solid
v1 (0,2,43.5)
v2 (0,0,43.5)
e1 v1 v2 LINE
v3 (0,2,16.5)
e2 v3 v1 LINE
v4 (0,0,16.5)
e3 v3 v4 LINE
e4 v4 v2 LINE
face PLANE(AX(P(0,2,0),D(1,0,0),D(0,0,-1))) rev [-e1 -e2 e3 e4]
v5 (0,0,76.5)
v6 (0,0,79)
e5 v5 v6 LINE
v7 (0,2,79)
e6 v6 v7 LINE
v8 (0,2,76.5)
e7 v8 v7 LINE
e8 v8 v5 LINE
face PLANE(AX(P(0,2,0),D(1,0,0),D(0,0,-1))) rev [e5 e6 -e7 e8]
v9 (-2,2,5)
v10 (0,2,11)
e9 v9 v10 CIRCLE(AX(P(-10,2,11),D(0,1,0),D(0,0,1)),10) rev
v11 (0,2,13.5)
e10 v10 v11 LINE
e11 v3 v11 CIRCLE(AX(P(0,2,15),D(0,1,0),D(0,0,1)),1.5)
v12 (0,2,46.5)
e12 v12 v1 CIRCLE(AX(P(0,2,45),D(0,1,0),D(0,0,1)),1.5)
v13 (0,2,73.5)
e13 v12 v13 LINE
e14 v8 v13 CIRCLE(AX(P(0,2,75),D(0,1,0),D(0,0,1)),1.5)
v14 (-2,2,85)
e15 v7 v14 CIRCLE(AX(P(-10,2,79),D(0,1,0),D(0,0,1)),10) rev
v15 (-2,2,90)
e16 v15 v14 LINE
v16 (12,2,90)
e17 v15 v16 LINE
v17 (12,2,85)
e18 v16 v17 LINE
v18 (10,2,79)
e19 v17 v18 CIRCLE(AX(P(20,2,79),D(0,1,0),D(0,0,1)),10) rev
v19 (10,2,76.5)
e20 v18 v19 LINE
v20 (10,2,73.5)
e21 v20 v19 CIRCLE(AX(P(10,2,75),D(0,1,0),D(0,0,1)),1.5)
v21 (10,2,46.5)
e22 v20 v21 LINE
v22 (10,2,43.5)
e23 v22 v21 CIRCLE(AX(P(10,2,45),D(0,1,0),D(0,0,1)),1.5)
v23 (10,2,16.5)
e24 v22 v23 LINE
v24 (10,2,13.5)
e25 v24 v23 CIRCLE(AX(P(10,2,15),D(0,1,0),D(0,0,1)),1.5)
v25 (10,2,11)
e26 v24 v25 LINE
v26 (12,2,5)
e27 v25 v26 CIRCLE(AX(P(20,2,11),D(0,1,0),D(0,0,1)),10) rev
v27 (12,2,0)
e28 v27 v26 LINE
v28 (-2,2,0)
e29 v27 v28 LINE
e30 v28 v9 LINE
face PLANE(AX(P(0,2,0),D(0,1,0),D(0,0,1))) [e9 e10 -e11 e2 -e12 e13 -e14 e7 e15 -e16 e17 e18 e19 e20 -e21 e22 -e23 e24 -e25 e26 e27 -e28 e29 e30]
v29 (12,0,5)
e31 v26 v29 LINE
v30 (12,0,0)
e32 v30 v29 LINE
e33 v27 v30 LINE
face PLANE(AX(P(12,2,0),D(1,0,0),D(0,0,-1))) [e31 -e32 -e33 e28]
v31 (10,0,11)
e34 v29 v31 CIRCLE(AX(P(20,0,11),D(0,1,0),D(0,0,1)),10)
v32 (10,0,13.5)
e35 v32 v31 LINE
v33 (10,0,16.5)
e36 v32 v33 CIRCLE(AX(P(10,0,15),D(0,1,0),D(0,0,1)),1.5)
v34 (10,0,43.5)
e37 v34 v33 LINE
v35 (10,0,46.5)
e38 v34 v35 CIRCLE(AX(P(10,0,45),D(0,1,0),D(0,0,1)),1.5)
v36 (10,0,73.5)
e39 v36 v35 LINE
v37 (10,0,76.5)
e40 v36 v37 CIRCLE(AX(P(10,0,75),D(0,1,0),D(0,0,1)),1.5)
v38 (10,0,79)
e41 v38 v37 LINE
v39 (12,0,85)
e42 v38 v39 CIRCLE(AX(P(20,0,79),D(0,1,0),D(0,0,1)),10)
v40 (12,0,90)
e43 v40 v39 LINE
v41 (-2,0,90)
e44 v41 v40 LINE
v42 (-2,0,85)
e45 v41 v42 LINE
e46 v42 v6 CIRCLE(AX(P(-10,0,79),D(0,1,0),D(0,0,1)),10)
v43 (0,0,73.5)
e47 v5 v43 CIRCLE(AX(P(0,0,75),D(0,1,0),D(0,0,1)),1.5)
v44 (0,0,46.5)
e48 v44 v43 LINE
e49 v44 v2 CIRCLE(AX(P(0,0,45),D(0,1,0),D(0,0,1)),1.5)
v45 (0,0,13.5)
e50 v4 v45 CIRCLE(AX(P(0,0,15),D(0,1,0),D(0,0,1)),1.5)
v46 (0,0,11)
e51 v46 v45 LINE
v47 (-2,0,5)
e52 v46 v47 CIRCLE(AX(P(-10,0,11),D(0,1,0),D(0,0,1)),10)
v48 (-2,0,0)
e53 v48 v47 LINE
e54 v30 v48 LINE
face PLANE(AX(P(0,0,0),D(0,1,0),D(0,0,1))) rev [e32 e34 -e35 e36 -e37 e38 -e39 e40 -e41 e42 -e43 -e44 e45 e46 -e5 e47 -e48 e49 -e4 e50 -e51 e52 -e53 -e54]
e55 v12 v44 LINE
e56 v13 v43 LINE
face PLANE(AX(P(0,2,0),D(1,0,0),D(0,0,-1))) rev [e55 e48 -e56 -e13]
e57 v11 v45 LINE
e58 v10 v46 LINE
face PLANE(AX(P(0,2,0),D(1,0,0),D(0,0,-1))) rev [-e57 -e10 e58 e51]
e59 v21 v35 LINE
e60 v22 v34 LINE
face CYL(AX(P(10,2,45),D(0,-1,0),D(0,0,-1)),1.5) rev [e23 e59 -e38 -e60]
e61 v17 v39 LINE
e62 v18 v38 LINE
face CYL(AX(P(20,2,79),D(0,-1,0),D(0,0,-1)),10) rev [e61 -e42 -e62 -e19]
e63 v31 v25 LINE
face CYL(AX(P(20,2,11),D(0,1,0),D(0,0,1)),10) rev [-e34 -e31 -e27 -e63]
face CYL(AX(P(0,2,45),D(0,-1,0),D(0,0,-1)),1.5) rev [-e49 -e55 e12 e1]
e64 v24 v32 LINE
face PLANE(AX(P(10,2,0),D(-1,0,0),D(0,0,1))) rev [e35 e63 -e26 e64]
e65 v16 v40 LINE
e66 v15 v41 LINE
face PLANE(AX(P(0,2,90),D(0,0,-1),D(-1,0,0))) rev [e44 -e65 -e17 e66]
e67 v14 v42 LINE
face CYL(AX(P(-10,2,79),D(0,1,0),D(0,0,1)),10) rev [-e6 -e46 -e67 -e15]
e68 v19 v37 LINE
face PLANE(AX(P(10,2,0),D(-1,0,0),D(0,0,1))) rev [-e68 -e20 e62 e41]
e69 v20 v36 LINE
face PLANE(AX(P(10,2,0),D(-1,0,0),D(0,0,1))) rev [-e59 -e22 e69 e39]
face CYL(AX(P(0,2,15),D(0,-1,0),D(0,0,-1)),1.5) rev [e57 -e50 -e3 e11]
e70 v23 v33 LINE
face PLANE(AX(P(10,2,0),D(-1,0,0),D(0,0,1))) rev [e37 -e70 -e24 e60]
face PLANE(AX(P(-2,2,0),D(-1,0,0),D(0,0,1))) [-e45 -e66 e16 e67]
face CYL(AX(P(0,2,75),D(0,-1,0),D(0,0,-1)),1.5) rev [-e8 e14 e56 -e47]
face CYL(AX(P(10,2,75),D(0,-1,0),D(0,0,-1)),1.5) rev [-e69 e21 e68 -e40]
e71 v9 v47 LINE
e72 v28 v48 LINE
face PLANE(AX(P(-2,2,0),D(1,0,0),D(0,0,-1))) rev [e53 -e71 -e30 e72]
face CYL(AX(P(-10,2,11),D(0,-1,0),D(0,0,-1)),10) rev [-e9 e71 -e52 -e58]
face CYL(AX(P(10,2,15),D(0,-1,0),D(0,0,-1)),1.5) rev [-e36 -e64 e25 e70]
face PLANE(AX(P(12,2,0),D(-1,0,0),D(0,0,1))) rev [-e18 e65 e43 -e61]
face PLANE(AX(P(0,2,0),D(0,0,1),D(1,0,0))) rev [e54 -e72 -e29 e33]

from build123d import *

# Parameters (mm, degrees)
SKETCH_1_W      = 2
SKETCH_1_H      = 5
EXTRUDE_1_DEPTH = 2
FILLET_1_R      = 10


with BuildPart() as part:
    # 草图1 → 凸台-拉伸1 (new body)
    with BuildSketch(Plane(origin=(0, 0, 0), x_dir=(1, 0, 0), z_dir=(0, 1, 0))):
        with BuildLine():
            Line((10, 0), (0, 0))
            Line((0, 0), (0, -5))
            Line((0, -5), (0, -13.5))
            ThreePointArc((0, -13.5), (1.060660172, -13.939339828), (1.5, -15))
            ThreePointArc((1.5, -15), (1.060660172, -16.060660172), (0, -16.5))
            Line((0, -16.5), (0, -43.5))
            ThreePointArc((0, -43.5), (1.060660172, -43.939339828), (1.5, -45))
            Line((1.5, -45), (2.5, -45))
            Line((2.5, -45), (2.5, -42.5))
            Line((2.5, -42.5), (7.5, -42.5))
            Line((7.5, -42.5), (7.5, -45))
            Line((7.5, -45), (8.5, -45))
            ThreePointArc((8.5, -45), (8.939339828, -43.939339828), (10, -43.5))
            Line((10, -43.5), (10, -16.5))
            ThreePointArc((10, -16.5), (8.5, -15), (10, -13.5))
            Line((10, -13.5), (10, -5))
            Line((10, -5), (10, 0))
        make_face()
        Polygon((2.5, -42.5), (2.5, -45), (5, -45), (7.5, -45), (7.5, -42.5), align=None)
        Polygon((5, -45), (2.5, -45), (2.5, -47.5), (7.5, -47.5), (7.5, -45), align=None)
        with BuildLine():
            Line((2.5, -45), (1.5, -45))
            ThreePointArc((1.5, -45), (1.060660172, -46.060660172), (0, -46.5))
            Line((0, -46.5), (0, -73.5))
            ThreePointArc((0, -73.5), (1.060660172, -73.939339828), (1.5, -75))
            ThreePointArc((1.5, -75), (1.060660172, -76.060660172), (0, -76.5))
            Line((0, -76.5), (0, -85))
            Line((0, -85), (0, -90))
            Line((0, -90), (10, -90))
            Line((10, -90), (10, -85))
            Line((10, -85), (10, -76.5))
            ThreePointArc((10, -76.5), (8.5, -75), (10, -73.5))
            Line((10, -73.5), (10, -46.5))
            ThreePointArc((10, -46.5), (8.939339828, -46.060660172), (8.5, -45))
            Line((8.5, -45), (7.5, -45))
            Line((7.5, -45), (7.5, -47.5))
            Line((7.5, -47.5), (2.5, -47.5))
            Line((2.5, -47.5), (2.5, -45))
        make_face()
        with Locations((11, -87.5)):
            Rectangle(SKETCH_1_W, SKETCH_1_H)
        with Locations((-1, -87.5)):
            Rectangle(SKETCH_1_W, SKETCH_1_H)
        with Locations((11, -2.5)):
            Rectangle(SKETCH_1_W, SKETCH_1_H)
        with Locations((-1, -2.5)):
            Rectangle(SKETCH_1_W, SKETCH_1_H)
    extrude(amount=EXTRUDE_1_DEPTH)

    # 圆角1
    # the kernel refuses this fillet: 10 mm, written as the material it adds along each edge
    with BuildSketch(Plane(origin=(10, 0, 85), x_dir=(0, 0, -1), z_dir=(0, 1, 0)), Plane(origin=(0, 0, 5), x_dir=(0, 0, 1), z_dir=(0, 1, 0))) as fillet_1_piece_1:
        with BuildLine():
            CenterArc((6, -10), FILLET_1_R, 90, 36.869897646)
            Line((0, -2), (0, 0))
            Line((0, 0), (6, 0))
        make_face()
    extrude(amount=2)
    with BuildSketch(Plane(origin=(0, 0, 85), x_dir=(-1, 0, 0), z_dir=(0, 1, 0)), Plane(origin=(10, 0, 5), x_dir=(1, 0, 0), z_dir=(0, 1, 0))) as fillet_1_piece_2:
        with BuildLine():
            CenterArc((10, -6), FILLET_1_R, 143.130102354, 36.869897646)
            Line((0, -6), (0, 0))
            Line((0, 0), (2, 0))
        make_face()
    extrude(amount=2)


solid = part.part
